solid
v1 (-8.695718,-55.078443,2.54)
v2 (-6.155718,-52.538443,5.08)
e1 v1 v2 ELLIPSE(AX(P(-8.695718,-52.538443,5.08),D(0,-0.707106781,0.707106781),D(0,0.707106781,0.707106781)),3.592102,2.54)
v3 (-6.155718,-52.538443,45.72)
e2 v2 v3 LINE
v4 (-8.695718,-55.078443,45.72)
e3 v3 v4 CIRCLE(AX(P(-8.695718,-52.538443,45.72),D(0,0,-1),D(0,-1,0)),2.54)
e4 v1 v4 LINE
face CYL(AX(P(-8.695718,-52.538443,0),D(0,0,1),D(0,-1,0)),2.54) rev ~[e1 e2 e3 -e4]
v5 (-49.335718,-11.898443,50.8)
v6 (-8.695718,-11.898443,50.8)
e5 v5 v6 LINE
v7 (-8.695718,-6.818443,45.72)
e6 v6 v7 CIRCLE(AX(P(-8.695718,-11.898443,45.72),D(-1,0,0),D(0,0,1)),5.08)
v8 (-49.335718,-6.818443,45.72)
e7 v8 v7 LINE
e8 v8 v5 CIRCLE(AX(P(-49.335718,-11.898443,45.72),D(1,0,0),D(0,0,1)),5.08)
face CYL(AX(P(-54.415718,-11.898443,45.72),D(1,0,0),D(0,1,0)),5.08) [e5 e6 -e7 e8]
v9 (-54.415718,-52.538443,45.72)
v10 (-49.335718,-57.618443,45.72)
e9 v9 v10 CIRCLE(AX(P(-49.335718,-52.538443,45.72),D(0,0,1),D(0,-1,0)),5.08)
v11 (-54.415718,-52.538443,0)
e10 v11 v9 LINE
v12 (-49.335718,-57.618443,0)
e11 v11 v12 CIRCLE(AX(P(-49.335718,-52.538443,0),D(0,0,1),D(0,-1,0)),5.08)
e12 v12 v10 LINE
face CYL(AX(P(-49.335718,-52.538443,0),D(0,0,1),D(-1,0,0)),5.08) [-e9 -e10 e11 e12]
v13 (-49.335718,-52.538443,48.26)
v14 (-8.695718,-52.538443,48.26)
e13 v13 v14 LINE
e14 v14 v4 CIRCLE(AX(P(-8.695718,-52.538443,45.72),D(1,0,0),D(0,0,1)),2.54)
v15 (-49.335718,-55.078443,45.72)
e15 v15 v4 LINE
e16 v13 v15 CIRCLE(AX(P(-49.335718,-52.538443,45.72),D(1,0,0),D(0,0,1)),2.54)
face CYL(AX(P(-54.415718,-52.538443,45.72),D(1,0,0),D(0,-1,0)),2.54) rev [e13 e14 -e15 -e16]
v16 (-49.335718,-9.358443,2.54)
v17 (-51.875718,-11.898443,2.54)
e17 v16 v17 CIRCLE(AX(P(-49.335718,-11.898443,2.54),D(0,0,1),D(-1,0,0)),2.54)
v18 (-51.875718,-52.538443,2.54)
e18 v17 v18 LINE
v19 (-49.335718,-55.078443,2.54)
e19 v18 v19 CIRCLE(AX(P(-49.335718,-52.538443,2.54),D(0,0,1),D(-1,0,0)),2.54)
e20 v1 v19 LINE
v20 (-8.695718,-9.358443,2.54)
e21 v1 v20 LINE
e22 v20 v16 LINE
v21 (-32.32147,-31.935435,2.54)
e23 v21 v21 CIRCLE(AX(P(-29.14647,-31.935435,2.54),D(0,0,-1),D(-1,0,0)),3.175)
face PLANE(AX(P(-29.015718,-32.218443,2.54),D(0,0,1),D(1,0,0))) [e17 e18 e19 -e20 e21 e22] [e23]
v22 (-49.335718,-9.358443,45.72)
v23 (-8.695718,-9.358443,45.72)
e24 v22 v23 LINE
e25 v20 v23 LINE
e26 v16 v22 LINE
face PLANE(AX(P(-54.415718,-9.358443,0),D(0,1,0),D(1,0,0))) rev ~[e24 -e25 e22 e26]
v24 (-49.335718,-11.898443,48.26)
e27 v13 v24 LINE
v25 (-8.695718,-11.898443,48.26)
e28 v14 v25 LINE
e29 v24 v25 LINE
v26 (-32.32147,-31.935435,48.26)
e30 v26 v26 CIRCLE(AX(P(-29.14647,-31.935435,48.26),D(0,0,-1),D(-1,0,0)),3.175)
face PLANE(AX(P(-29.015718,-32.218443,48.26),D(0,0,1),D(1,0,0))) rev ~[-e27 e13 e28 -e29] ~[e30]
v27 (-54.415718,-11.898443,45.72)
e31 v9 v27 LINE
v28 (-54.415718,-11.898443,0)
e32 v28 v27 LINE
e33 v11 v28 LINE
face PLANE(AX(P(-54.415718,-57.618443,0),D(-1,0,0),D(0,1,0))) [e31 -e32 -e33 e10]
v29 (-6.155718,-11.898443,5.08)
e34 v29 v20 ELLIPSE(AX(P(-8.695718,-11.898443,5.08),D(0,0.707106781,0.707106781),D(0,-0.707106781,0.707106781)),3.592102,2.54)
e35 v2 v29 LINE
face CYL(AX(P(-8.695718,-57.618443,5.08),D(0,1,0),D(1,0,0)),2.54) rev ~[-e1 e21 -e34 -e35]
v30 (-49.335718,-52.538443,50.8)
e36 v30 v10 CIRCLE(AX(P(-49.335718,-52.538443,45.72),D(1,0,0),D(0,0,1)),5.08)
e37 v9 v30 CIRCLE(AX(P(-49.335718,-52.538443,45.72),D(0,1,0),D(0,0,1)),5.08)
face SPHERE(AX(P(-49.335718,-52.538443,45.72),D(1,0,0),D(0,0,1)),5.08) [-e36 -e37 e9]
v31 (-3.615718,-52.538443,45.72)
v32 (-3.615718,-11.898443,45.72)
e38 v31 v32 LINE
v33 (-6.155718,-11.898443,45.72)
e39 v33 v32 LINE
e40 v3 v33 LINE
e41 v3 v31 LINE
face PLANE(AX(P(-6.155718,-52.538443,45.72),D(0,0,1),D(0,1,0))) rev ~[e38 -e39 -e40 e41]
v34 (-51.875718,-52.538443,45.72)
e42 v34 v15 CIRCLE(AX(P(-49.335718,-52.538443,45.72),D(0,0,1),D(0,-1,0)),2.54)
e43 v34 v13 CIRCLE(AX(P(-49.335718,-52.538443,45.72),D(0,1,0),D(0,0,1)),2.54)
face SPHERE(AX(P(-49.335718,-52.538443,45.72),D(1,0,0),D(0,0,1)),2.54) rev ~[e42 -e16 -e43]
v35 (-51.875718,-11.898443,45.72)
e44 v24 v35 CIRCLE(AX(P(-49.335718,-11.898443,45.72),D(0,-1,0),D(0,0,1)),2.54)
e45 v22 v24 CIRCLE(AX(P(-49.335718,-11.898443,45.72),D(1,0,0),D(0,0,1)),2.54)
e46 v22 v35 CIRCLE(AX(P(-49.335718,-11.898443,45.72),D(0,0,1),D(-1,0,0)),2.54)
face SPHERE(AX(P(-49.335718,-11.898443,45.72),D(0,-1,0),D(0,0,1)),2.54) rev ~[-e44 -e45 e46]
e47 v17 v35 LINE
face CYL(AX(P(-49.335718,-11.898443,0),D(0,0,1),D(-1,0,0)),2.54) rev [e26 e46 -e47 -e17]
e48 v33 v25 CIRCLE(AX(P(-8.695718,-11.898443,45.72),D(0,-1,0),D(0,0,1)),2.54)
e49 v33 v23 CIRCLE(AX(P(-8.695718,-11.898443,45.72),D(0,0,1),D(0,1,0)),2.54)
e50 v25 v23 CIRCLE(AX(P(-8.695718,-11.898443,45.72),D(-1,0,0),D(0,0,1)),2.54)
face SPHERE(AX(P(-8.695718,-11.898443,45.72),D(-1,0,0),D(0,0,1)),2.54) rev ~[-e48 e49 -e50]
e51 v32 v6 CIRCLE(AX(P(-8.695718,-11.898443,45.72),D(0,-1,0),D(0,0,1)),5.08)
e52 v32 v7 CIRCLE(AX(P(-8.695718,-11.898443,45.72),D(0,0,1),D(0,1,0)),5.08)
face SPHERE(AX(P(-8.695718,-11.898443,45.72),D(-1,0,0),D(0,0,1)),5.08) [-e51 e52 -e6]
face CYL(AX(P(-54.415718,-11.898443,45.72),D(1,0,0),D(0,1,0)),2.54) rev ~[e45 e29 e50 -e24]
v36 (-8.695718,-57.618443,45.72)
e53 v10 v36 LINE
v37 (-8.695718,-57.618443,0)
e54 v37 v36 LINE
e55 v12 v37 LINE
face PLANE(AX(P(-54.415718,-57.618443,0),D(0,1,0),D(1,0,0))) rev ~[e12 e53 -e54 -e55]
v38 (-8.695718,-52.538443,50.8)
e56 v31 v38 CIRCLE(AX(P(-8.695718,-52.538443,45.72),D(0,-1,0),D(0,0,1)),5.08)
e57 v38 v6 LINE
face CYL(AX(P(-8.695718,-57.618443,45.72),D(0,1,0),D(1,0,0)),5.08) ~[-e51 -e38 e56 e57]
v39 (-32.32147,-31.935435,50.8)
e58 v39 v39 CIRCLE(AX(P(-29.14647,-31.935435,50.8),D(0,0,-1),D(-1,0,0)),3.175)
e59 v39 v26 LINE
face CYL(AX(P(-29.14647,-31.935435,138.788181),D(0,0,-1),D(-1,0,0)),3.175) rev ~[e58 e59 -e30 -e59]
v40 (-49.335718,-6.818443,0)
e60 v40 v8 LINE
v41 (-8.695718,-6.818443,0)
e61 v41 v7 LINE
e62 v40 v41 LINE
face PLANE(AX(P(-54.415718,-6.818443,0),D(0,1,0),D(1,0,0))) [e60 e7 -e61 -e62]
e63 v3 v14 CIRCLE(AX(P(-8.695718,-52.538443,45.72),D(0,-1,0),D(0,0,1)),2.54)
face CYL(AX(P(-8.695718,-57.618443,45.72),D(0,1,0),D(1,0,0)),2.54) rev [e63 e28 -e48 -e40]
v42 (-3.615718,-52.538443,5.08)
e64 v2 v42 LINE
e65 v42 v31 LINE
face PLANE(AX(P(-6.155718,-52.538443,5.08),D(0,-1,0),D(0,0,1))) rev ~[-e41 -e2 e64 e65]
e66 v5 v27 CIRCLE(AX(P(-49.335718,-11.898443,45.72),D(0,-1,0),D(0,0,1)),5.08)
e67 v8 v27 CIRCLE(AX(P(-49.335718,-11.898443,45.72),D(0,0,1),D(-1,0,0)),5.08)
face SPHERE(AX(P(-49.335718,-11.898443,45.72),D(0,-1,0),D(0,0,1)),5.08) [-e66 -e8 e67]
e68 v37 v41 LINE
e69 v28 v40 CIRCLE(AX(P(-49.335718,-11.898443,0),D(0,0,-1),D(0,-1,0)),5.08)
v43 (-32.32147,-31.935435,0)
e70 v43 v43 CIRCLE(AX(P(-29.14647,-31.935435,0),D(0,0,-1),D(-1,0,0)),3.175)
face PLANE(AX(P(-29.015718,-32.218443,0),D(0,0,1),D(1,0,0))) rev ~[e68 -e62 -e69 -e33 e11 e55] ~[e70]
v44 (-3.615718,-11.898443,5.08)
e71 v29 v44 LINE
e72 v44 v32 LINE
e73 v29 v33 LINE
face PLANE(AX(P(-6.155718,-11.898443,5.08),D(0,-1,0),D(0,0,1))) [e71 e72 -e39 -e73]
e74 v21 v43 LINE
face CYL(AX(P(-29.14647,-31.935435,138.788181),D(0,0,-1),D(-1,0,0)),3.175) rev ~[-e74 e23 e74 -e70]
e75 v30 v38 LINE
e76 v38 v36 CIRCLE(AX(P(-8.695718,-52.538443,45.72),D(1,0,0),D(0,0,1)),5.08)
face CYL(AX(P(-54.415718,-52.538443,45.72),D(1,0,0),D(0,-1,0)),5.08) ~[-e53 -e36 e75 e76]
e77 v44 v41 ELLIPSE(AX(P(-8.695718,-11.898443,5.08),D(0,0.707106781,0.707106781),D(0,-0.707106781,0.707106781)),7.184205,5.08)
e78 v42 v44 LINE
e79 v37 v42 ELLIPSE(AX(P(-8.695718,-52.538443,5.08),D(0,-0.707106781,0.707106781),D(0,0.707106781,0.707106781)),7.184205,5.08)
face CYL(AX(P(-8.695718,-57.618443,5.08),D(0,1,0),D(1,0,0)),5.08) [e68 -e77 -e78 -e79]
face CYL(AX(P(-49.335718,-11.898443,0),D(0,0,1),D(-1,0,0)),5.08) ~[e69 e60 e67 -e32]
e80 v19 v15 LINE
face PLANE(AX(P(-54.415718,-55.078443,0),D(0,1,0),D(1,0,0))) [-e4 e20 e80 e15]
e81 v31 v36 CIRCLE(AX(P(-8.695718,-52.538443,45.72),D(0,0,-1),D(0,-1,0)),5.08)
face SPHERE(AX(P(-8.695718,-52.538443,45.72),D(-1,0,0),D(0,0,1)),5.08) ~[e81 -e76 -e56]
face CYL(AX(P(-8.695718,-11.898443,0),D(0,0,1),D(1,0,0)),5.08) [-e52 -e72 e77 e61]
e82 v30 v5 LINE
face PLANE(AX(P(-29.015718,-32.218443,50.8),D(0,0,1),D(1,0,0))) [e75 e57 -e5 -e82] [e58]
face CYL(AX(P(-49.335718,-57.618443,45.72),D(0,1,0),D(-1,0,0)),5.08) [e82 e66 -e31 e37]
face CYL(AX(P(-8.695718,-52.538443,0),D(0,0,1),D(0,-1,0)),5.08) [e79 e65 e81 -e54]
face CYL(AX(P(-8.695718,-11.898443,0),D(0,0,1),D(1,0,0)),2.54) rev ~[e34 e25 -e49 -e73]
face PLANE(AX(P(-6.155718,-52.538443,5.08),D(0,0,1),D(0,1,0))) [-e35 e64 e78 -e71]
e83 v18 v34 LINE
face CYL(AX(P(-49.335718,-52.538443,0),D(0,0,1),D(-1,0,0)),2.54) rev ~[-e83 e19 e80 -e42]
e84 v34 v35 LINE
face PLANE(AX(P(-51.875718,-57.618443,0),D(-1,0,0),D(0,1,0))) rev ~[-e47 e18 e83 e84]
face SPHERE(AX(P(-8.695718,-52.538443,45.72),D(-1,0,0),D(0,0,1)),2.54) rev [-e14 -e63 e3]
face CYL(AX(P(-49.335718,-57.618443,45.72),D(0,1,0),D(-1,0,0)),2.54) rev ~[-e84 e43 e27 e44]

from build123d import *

# Parameters (mm, degrees)
F0_W     = 50.8
F0_H     = 50.8
F1_DEPTH = 50.8
F3_R     = 5.08
F5_T     = -2.54
F7_D     = 6.35


# Not quite as in the source:
# - a shell that OpenCascade refuses in one call is made with other operations: the cavity is built on its own and cut out


with BuildPart() as f1:
    # F0 (on Top) → F1 (new body)
    with BuildSketch(Plane.XY):
        with Locations((-29.015717721, -32.2184429228)):
            Rectangle(F0_W, F0_H)
    extrude(amount=F1_DEPTH)

    # F3
    f3_edges = [f1.edges().sort_by_distance(p)[0] for p in [
        (-29.015718, -57.618443, 50.8),
        (-54.415718, -32.218443, 50.8),
        (-29.015718, -6.818443, 50.8),
        (-3.615718, -32.218443, 50.8),
        (-54.415718, -57.618443, 25.4),
        (-54.415718, -6.818443, 25.4),
        (-3.615718, -6.818443, 25.4),
        (-3.615718, -57.618443, 25.4),
        (-3.615718, -32.218443, 0),
    ]]
    fillet(f3_edges, radius=F3_R)

    # F5: a shell. OpenCascade refuses it in one call, so the cavity is built on its own and cut out:
    # the body offset inwards by the wall thickness, plus a prism from it out through each open face.
    f5_core = offset(f1.part, amount=F5_T, mode=Mode.PRIVATE)
    f5_exits = [f5_core.faces().sort_by_distance(p)[0] for p in [
        (-6.155718, -32.218443, 25.4),
    ]]
    add(f5_core, mode=Mode.SUBTRACT)
    extrude(f5_exits, amount=-F5_T, mode=Mode.SUBTRACT)

    # F7 (through all)
    with Locations(Plane.XY.offset(50.8)):
        with Locations((-29.1464701295, -31.9354347885)):
            Hole(F7_D / 2)


solid = f1.part
